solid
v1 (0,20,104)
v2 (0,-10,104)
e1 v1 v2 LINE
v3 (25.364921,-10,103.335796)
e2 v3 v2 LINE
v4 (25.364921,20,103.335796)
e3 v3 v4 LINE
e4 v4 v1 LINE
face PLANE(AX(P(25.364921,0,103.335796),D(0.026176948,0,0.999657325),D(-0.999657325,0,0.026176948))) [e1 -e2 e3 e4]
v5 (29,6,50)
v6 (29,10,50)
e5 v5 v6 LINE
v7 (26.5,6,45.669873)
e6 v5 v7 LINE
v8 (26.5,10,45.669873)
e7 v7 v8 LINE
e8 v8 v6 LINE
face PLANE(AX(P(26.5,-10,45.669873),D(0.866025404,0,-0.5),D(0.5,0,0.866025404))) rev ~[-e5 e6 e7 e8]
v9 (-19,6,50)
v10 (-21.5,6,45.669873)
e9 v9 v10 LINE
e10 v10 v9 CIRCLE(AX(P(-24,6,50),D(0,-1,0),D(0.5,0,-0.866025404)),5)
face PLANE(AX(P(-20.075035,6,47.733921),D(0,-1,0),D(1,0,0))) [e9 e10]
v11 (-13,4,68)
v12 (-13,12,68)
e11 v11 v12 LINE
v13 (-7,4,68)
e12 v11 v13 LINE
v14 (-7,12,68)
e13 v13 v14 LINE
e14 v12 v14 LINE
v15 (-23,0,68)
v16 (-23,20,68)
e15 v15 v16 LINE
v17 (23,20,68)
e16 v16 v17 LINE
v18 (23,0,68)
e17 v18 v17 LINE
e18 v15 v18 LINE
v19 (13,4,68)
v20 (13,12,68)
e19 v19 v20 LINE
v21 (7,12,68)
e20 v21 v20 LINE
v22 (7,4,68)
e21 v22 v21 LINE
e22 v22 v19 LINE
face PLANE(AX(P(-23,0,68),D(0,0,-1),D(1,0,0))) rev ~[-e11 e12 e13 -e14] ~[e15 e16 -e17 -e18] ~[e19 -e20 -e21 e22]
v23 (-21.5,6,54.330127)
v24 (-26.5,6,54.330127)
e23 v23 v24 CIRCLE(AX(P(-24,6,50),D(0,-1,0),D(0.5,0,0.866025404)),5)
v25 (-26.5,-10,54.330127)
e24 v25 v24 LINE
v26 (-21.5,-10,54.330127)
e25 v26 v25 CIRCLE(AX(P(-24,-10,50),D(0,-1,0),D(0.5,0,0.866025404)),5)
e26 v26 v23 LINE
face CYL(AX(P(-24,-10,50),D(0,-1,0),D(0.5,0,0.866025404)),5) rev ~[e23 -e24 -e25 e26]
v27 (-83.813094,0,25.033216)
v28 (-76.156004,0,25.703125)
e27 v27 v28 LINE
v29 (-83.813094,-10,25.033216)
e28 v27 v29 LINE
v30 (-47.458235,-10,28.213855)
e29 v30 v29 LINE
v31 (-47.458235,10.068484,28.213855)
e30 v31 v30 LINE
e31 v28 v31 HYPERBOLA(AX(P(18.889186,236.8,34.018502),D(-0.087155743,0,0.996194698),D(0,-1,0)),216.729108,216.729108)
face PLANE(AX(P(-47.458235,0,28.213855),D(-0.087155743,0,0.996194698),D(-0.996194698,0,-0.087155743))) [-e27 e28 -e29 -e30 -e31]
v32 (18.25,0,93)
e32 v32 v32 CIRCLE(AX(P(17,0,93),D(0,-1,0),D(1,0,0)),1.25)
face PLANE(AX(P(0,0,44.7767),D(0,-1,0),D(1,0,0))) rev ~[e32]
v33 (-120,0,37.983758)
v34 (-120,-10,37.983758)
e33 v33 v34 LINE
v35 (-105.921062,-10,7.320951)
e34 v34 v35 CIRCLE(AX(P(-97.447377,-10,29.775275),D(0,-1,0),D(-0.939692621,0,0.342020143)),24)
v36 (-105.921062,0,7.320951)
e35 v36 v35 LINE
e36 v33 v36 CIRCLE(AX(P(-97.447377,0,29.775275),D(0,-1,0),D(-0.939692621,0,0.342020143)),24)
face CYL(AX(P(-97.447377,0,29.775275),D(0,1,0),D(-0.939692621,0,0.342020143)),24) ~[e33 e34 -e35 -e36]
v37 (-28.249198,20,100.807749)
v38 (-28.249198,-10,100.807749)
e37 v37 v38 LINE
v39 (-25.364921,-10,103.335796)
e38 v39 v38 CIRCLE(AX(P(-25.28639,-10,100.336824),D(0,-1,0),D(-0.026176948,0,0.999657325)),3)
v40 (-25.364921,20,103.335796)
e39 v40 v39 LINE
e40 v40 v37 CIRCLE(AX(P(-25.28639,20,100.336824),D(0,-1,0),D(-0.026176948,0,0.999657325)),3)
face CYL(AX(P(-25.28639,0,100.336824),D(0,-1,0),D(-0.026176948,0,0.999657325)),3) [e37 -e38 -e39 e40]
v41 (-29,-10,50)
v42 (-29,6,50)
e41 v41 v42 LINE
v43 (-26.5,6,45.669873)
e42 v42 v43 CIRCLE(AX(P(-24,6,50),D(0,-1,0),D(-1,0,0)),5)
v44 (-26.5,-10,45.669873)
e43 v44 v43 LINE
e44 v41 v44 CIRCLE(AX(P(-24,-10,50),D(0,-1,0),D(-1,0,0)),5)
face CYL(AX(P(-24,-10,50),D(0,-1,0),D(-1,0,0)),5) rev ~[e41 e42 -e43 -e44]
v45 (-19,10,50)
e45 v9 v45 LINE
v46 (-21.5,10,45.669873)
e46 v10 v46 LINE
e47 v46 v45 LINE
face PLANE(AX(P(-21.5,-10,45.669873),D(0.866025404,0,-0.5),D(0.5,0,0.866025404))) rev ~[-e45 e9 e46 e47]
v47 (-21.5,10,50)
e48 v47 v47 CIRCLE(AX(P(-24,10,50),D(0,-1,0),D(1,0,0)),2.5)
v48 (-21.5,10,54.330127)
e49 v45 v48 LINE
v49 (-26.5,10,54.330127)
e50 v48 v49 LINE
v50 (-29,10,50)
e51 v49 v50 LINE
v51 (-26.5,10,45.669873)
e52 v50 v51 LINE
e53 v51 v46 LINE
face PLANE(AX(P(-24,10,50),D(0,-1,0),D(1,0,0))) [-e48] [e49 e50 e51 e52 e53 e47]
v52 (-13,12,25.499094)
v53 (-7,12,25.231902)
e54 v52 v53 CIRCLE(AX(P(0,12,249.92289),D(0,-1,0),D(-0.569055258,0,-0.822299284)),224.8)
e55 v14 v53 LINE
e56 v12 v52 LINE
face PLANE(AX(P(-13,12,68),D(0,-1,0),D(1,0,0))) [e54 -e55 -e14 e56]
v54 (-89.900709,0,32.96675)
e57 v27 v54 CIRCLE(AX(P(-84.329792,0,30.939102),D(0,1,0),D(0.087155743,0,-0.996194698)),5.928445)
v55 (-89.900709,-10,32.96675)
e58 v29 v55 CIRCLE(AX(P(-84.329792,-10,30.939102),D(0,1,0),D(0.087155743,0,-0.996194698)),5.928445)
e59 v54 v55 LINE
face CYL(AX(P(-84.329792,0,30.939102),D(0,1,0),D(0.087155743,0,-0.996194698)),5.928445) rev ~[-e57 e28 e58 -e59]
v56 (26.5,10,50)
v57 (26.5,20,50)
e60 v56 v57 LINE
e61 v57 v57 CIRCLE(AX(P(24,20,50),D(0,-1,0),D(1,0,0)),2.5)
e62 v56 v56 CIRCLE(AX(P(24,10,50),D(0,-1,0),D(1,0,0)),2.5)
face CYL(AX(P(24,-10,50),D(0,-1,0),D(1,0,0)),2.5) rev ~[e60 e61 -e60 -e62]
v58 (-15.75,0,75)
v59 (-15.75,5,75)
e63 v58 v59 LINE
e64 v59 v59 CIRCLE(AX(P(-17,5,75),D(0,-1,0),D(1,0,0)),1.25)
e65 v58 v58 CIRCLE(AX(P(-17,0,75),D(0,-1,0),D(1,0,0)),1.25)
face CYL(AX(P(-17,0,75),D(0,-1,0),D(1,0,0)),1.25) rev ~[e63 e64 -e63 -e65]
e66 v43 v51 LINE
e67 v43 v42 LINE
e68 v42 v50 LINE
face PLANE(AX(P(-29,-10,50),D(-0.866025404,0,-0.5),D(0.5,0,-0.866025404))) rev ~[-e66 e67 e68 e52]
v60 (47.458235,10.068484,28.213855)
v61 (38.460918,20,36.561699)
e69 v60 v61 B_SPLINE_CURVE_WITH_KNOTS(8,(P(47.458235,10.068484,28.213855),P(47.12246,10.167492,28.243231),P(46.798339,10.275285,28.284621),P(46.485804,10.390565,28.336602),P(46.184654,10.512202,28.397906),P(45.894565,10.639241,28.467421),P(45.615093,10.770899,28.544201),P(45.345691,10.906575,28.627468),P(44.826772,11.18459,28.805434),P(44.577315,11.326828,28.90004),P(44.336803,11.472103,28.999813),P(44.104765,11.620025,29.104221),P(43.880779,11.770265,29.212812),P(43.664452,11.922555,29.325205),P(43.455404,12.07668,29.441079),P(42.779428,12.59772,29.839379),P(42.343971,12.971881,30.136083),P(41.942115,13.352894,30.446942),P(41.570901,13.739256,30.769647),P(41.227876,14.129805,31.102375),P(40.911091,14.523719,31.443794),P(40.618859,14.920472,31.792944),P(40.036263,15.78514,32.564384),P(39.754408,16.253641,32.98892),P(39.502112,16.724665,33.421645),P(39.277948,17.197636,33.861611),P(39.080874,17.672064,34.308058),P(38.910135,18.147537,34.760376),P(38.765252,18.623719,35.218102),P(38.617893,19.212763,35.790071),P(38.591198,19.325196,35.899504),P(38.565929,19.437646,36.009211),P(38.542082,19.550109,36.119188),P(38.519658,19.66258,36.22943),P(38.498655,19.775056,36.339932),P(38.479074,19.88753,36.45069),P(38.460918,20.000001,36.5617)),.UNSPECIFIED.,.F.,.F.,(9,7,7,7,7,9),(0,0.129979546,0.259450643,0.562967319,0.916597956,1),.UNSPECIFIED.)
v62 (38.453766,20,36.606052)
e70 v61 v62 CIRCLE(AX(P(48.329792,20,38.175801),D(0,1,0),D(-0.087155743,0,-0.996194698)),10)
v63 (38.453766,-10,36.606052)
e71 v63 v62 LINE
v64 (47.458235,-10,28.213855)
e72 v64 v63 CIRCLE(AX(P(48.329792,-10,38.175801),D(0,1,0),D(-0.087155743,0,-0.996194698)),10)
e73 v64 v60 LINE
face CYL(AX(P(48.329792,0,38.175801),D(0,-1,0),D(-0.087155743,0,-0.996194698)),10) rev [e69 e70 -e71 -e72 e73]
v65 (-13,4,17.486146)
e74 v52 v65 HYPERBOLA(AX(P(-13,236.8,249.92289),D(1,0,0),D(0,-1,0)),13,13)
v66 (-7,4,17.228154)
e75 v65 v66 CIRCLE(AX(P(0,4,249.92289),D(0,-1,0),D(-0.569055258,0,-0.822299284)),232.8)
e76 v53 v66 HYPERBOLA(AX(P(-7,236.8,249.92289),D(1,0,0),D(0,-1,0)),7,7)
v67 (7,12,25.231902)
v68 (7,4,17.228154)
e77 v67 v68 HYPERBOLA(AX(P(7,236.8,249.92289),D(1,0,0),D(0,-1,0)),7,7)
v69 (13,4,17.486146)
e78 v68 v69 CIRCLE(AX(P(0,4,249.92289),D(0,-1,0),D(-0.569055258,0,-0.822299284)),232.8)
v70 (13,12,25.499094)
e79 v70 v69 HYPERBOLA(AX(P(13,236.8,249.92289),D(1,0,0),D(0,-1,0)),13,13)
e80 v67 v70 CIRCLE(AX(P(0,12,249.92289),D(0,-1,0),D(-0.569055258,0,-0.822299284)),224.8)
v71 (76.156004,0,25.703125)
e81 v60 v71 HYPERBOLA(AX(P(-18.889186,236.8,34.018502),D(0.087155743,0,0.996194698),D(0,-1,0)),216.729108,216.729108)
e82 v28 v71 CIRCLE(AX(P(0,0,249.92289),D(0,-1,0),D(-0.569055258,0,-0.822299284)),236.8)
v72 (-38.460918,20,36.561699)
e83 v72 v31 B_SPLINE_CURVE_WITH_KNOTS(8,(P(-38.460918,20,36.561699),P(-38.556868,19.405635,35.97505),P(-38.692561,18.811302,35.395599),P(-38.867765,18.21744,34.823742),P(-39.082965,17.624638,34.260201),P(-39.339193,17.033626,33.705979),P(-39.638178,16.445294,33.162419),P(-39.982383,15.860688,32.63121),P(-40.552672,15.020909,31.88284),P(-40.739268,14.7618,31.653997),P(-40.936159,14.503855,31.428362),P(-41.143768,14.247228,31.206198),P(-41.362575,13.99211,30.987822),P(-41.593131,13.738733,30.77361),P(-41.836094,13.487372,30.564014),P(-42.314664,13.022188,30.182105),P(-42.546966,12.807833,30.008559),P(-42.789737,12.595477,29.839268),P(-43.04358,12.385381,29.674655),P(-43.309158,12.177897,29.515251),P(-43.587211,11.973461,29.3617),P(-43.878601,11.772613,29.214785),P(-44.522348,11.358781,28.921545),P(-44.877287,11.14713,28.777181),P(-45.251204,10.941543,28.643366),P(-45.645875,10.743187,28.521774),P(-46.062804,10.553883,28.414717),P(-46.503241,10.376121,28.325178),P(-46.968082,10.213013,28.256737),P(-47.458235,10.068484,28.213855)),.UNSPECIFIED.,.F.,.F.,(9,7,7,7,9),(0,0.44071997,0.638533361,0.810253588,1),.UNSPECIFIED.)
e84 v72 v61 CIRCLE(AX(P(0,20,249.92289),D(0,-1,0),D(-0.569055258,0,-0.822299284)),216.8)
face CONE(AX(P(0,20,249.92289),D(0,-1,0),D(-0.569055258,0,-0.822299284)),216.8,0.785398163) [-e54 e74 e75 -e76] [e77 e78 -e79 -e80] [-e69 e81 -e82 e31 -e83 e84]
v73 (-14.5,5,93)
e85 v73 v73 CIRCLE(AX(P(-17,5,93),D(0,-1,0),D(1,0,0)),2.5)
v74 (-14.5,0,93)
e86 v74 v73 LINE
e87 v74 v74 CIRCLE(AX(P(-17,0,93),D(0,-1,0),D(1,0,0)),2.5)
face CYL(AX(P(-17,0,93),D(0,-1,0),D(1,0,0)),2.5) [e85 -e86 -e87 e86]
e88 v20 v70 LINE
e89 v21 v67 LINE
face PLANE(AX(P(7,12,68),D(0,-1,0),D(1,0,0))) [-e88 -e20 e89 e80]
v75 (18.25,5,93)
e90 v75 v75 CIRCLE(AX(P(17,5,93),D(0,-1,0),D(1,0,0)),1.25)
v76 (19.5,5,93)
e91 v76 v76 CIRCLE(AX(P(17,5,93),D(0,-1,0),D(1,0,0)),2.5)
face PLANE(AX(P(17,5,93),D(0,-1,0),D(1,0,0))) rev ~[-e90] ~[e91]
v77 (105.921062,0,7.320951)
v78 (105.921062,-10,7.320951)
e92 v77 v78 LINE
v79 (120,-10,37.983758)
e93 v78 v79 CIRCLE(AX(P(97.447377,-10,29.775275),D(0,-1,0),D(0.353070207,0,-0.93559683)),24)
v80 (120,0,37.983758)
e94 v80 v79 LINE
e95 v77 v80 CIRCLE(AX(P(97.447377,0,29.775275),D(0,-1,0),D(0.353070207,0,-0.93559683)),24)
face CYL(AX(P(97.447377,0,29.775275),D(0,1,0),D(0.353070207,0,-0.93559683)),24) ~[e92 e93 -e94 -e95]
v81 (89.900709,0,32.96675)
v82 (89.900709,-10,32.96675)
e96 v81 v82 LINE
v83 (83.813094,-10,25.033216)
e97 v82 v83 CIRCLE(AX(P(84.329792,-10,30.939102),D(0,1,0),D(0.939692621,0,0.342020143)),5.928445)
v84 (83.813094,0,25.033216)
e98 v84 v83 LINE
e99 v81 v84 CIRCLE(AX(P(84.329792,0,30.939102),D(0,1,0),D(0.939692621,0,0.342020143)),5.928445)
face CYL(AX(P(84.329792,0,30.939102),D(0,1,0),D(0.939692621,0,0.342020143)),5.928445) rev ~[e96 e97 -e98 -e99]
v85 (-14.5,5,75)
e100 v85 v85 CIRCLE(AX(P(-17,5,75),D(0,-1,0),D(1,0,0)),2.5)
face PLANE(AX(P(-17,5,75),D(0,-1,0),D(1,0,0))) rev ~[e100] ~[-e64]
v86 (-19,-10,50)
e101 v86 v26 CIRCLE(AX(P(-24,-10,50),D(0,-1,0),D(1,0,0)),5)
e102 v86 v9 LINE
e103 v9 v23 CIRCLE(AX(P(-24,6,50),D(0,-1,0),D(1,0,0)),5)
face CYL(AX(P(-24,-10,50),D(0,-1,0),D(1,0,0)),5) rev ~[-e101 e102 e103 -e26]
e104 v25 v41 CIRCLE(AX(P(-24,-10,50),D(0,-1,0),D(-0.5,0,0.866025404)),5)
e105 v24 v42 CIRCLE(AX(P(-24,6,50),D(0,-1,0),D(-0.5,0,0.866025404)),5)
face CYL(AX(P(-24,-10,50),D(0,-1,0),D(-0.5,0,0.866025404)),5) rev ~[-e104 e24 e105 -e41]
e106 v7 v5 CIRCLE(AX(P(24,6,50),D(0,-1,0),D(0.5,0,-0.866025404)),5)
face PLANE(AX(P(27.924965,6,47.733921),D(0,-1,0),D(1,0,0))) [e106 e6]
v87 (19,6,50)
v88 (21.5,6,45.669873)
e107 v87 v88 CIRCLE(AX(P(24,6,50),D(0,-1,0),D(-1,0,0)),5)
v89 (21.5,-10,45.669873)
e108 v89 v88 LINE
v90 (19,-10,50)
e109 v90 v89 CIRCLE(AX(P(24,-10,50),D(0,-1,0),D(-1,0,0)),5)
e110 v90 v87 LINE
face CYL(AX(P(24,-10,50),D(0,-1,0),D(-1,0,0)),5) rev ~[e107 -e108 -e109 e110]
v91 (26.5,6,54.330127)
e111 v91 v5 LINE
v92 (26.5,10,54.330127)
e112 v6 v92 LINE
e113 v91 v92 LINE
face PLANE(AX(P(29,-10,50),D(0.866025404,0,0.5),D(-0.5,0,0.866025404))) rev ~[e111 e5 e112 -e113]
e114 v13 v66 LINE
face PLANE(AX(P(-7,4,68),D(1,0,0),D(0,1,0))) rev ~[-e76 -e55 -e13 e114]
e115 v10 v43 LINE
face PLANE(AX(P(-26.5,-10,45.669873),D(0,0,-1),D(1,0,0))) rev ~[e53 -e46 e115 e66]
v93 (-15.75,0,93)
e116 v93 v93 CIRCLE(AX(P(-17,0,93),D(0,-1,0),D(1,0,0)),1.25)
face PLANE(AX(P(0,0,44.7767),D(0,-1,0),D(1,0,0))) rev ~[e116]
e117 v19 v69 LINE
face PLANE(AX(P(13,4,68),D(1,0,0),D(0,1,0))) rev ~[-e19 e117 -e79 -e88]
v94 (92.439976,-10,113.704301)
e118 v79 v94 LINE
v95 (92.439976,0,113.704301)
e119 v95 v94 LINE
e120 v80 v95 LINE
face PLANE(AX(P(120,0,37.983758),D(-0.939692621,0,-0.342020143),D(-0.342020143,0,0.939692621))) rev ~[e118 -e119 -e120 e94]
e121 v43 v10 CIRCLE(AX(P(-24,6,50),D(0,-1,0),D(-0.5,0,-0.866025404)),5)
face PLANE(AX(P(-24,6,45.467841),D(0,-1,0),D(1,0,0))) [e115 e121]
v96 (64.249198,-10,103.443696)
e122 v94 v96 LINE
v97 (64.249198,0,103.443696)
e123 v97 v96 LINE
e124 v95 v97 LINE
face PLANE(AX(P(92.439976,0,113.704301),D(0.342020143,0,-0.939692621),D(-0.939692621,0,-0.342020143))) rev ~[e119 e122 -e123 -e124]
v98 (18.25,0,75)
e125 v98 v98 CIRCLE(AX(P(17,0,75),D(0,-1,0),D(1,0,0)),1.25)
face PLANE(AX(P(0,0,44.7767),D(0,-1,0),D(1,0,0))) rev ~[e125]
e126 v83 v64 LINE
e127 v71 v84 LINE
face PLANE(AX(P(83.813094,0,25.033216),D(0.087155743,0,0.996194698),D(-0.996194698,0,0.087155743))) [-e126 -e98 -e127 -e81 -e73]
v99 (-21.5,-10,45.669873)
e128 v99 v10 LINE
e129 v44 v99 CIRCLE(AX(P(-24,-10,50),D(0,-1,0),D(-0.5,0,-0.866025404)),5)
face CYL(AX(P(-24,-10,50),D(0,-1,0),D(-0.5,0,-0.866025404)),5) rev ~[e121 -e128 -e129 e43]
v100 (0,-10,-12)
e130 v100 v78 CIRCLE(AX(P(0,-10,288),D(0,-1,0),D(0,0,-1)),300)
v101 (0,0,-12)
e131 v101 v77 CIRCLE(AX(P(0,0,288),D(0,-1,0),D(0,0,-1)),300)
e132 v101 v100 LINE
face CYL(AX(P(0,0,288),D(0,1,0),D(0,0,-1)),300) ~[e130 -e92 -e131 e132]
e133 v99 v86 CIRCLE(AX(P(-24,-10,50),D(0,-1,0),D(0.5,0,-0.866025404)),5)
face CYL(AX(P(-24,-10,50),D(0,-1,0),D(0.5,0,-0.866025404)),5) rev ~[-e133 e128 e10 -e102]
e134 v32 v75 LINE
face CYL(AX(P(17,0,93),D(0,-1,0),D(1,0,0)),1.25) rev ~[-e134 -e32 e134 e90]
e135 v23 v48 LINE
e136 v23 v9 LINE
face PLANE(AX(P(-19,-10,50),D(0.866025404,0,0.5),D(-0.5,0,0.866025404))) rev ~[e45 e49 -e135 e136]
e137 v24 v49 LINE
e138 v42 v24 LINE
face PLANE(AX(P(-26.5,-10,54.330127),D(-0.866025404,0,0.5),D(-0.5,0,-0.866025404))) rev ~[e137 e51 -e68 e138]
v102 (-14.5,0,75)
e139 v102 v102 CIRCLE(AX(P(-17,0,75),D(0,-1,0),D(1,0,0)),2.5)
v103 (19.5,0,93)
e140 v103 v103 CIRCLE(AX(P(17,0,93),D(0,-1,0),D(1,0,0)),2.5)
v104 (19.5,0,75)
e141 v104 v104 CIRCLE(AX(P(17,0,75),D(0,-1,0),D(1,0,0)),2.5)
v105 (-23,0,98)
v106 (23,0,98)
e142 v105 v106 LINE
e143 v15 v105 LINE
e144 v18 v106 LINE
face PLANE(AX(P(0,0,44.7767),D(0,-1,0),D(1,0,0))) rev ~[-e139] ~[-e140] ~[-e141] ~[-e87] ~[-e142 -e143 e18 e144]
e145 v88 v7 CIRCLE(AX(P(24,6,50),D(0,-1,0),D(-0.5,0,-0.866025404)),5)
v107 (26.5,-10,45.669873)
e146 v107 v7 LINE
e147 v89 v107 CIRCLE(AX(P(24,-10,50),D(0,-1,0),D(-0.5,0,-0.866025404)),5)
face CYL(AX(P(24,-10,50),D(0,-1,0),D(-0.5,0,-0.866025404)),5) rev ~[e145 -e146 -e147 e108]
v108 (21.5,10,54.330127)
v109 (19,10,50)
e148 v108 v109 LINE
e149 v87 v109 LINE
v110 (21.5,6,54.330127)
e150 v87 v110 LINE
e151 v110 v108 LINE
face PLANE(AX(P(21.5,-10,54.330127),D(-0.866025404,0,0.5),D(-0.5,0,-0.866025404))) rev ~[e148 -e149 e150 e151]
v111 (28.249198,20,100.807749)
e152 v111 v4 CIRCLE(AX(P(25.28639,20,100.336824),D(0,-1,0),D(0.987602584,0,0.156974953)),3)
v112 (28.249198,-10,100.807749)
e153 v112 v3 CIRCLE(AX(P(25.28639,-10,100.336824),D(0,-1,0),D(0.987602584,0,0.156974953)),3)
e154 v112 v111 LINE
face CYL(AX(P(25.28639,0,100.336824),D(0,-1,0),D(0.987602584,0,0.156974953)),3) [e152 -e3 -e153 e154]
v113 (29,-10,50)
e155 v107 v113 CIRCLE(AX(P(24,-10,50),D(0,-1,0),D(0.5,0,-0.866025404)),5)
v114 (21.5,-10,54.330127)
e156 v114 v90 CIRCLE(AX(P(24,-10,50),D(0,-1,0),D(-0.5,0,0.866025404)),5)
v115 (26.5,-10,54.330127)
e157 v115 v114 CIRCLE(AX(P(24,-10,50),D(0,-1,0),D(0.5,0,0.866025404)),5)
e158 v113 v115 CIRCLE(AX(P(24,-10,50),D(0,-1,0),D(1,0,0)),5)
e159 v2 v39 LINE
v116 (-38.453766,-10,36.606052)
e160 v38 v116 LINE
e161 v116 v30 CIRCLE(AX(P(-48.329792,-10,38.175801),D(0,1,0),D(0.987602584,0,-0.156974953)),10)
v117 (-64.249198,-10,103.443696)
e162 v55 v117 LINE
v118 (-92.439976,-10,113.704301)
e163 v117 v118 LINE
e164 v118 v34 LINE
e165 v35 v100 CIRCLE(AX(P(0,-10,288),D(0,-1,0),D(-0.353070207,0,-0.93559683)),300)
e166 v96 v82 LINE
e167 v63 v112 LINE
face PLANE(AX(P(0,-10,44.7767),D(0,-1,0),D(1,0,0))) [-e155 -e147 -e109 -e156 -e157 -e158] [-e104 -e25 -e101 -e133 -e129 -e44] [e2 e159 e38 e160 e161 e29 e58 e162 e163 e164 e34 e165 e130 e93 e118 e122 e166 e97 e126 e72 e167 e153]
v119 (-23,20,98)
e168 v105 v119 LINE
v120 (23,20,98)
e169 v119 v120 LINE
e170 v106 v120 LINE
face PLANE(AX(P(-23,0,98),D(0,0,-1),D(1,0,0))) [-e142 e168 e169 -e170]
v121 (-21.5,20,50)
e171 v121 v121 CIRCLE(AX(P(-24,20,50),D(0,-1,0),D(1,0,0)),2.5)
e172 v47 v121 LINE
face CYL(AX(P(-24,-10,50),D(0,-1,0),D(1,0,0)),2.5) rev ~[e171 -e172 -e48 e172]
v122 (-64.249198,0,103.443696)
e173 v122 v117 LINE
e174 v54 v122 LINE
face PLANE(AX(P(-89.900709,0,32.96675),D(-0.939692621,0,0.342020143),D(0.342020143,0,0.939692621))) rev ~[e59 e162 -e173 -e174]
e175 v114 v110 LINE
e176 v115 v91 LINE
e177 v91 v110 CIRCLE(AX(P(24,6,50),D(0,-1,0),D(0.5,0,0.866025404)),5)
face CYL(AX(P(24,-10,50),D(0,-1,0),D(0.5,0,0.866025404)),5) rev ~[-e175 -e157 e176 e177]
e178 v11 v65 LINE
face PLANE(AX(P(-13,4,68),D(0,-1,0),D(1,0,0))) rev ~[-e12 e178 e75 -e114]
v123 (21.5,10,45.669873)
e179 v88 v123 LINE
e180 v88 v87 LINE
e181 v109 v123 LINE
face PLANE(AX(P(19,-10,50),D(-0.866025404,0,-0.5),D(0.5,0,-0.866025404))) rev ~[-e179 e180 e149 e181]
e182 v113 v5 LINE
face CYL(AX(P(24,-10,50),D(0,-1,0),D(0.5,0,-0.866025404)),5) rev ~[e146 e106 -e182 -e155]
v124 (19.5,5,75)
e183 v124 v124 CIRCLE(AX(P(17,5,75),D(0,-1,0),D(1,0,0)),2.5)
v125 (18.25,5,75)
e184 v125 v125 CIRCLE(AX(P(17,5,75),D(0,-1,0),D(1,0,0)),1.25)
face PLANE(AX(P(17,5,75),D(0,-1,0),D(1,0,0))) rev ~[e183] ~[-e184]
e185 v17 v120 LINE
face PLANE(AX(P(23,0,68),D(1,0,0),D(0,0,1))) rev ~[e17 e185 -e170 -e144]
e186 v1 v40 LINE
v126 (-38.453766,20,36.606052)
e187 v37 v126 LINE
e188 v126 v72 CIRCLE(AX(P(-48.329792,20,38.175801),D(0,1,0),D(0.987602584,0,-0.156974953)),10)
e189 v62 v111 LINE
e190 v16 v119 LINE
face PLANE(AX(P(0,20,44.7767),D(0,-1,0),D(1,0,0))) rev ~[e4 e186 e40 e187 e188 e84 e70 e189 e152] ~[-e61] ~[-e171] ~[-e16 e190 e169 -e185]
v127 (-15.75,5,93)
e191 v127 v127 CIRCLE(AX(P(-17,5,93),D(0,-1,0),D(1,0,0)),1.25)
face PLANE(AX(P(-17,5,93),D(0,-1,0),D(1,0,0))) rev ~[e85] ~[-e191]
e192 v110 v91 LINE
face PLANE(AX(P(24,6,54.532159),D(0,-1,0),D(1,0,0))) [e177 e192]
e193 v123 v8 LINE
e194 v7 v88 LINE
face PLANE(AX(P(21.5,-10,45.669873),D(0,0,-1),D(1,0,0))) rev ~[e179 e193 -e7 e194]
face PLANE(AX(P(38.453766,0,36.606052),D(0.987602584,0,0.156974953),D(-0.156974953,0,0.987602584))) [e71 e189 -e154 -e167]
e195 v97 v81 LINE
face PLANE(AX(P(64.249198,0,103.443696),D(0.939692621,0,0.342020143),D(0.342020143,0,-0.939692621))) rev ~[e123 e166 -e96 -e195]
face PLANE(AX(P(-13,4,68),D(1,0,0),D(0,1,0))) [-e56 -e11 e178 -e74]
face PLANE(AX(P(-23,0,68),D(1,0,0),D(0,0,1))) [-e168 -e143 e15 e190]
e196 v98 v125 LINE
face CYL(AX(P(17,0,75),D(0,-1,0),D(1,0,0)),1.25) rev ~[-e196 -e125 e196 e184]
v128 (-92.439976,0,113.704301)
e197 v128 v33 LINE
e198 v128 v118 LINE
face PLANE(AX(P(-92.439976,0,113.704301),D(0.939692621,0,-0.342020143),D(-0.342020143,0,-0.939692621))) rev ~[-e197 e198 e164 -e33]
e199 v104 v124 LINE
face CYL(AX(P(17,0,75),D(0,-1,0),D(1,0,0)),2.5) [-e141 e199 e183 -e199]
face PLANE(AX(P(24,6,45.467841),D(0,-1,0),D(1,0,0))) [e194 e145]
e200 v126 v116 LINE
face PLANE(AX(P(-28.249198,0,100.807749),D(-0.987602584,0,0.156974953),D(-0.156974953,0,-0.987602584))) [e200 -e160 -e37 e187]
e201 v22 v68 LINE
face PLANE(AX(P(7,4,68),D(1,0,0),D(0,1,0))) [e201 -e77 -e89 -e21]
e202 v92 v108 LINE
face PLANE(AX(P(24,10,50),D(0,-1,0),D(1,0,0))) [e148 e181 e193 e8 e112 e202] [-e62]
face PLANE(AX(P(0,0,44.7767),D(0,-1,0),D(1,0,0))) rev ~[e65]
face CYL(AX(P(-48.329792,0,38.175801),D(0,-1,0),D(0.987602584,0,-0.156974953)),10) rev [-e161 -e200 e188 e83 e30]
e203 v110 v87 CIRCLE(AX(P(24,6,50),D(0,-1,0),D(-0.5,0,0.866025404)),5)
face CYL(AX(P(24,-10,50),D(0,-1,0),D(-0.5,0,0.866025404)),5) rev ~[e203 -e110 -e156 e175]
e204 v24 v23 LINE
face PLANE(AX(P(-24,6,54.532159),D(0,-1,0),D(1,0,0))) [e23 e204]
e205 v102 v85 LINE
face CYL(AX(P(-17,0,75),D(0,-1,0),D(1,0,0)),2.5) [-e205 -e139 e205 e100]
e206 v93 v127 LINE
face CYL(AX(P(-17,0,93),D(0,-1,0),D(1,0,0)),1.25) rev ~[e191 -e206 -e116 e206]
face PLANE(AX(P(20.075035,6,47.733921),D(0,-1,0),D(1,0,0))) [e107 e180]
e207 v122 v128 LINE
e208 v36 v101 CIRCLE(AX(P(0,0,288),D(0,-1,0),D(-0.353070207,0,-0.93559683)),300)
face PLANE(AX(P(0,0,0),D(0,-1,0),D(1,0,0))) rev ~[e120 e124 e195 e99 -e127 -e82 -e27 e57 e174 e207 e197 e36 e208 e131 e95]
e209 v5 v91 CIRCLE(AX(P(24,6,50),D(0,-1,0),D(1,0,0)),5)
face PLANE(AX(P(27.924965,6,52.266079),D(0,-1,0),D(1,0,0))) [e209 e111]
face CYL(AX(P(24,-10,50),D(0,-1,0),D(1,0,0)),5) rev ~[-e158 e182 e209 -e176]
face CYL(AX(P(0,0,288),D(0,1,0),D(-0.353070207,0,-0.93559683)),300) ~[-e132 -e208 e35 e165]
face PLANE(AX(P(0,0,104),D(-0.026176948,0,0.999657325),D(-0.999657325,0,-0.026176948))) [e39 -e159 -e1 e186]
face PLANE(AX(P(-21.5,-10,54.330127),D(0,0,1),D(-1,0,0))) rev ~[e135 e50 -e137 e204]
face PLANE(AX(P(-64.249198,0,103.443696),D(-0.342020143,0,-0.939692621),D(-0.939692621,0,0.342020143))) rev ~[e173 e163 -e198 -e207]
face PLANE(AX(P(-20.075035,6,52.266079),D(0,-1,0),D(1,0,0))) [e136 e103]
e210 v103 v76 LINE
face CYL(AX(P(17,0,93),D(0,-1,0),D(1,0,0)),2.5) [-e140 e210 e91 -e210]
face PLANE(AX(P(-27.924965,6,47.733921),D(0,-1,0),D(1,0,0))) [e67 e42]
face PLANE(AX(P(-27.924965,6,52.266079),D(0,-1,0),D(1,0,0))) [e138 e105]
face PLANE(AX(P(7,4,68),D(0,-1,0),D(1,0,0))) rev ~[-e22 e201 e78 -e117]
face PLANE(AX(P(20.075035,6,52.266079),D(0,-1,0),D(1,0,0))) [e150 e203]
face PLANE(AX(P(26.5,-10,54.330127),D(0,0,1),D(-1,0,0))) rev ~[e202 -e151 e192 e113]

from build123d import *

# Parameters (mm, degrees)
F0_W        = 46
F0_H        = 30
F0_R        = 2.5
F0_R_2      = 1.25
F1_DEPTH    = 10
F2_DEPTH    = 20
F3_R        = 2.5
F4_DEPTH    = 30
F5_DEPTH    = 20
F6_DEPTH    = 16
F7_DEPTH    = 5
F8_T4_ANGLE = 69.3687445925
F9_W        = 6
F9_H        = 8
F10_REACH   = 90.001


# Not quite as in the source:
# - a fillet or chamfer that OpenCascade refuses, or shapes differently, is made with other operations: its cross-section is extruded or revolved along the edge and cut away or added
# - a feature names something its author has since deleted; it is built from what else it names


with BuildPart() as f1:
    # F0 (on Front) → F1 (new body)
    with BuildSketch(Plane.XZ):
        with BuildLine():
            Line((25.3649208898, 103.335796171), (0, 104))
            Line((0, 104), (-25.3649208898, 103.335796171))
            ThreePointArc((-25.3649208898, 103.335796171), (-27.2638102508, 102.5928847735), (-28.2491977972, 100.8077490551))
            Line((-28.2491977972, 100.8077490551), (-38.4537664635, 36.6060519686))
            ThreePointArc((-38.4537664635, 36.6060519686), (-41.511810122, 30.8603986419), (-47.4582348771, 28.2138545179))
            Line((-47.4582348771, 28.2138545179), (-83.8130942566, 25.0332164582))
            ThreePointArc((-83.8130942566, 25.0332164582), (0, 9.922889923), (83.8130942566, 25.0332164582))
            Line((83.8130942566, 25.0332164582), (47.4582348771, 28.2138545179))
            ThreePointArc((47.4582348771, 28.2138545179), (41.511810122, 30.8603986419), (38.4537664635, 36.6060519686))
            Line((38.4537664635, 36.6060519686), (28.2491977972, 100.8077490551))
            ThreePointArc((28.2491977972, 100.8077490551), (27.2638102508, 102.5928847735), (25.3649208898, 103.335796171))
        make_face()
        with Locations((0, 83)):
            Rectangle(F0_W, F0_H, mode=Mode.SUBTRACT)
        with Locations((0, 83)):
            Rectangle(F0_W, F0_H)
        with Locations((-17, 75)):
            Circle(F0_R, mode=Mode.SUBTRACT)
        with Locations((-17, 93)):
            Circle(F0_R, mode=Mode.SUBTRACT)
        with Locations((17, 75)):
            Circle(F0_R, mode=Mode.SUBTRACT)
        with Locations((17, 93)):
            Circle(F0_R, mode=Mode.SUBTRACT)
        with Locations((17, 93)):
            Circle(F0_R)
        with Locations((17, 93)):
            Circle(F0_R_2, mode=Mode.SUBTRACT)
        with Locations((17, 75)):
            Circle(F0_R)
        with Locations((17, 75)):
            Circle(F0_R_2, mode=Mode.SUBTRACT)
        with Locations((-17, 93)):
            Circle(F0_R)
        with Locations((-17, 93)):
            Circle(F0_R_2, mode=Mode.SUBTRACT)
        with Locations((-17, 75)):
            Circle(F0_R)
        with Locations((-17, 75)):
            Circle(F0_R_2, mode=Mode.SUBTRACT)
        with Locations((17, 93)):
            Circle(F0_R_2)
        with Locations((-17, 93)):
            Circle(F0_R_2)
        with Locations((-17, 75)):
            Circle(F0_R_2)
        with Locations((17, 75)):
            Circle(F0_R_2)
        with BuildLine():
            ThreePointArc((83.8130942566, 25.0332164582), (0, 9.922889923), (-83.8130942566, 25.0332164582))
            ThreePointArc((-83.8130942566, 25.0332164582), (-89.0331441362, 27.330093377), (-89.9007085466, 32.9667498611))
            Line((-89.9007085466, 32.9667498611), (-64.2491977972, 103.44369642))
            Line((-64.2491977972, 103.44369642), (-92.4399764208, 113.7043007198))
            Line((-92.4399764208, 113.7043007198), (-120, 37.9837582563))
            ThreePointArc((-120, 37.9837582563), (-119.2581515912, 19.7607795149), (-105.9210620665, 7.3209508875))
            ThreePointArc((-105.9210620665, 7.3209508875), (-53.8344000907, -7.1302379745), (0, -12))
            ThreePointArc((0, -12), (53.8344000907, -7.1302379745), (105.9210620665, 7.3209508875))
            ThreePointArc((105.9210620665, 7.3209508875), (119.2581515912, 19.7607795149), (120, 37.9837582563))
            Line((120, 37.9837582563), (92.4399764208, 113.7043007198))
            Line((92.4399764208, 113.7043007198), (64.2491977972, 103.44369642))
            Line((64.2491977972, 103.44369642), (89.9007085466, 32.9667498611))
            ThreePointArc((89.9007085466, 32.9667498611), (89.0331441362, 27.330093377), (83.8130942566, 25.0332164582))
        make_face()
    extrude(amount=F1_DEPTH)

    # F0 (on Front) → F2 (join)
    with BuildSketch(Plane.XZ):
        with BuildLine():
            Line((25.3649208898, 103.335796171), (0, 104))
            Line((0, 104), (-25.3649208898, 103.335796171))
            ThreePointArc((-25.3649208898, 103.335796171), (-27.2638102508, 102.5928847735), (-28.2491977972, 100.8077490551))
            Line((-28.2491977972, 100.8077490551), (-38.4537664635, 36.6060519686))
            ThreePointArc((-38.4537664635, 36.6060519686), (-41.511810122, 30.8603986419), (-47.4582348771, 28.2138545179))
            Line((-47.4582348771, 28.2138545179), (-83.8130942566, 25.0332164582))
            ThreePointArc((-83.8130942566, 25.0332164582), (0, 9.922889923), (83.8130942566, 25.0332164582))
            Line((83.8130942566, 25.0332164582), (47.4582348771, 28.2138545179))
            ThreePointArc((47.4582348771, 28.2138545179), (41.511810122, 30.8603986419), (38.4537664635, 36.6060519686))
            Line((38.4537664635, 36.6060519686), (28.2491977972, 100.8077490551))
            ThreePointArc((28.2491977972, 100.8077490551), (27.2638102508, 102.5928847735), (25.3649208898, 103.335796171))
        make_face()
        with Locations((0, 83)):
            Rectangle(F0_W, F0_H, mode=Mode.SUBTRACT)
    extrude(amount=-F2_DEPTH)

    # F3 (on face) → F4 (cut, through all)
    with BuildSketch(Plane.XZ.offset(10)):
        with Locations((-24, 50)):
            Circle(F3_R)
        with Locations((24, 50)):
            Circle(F3_R)
    extrude(amount=-F4_DEPTH, mode=Mode.SUBTRACT)

    # F3 (on face) → F5 (cut, through all)
    with BuildSketch(Plane.XZ.offset(10)):
        Polygon((-21.5, 45.6698729811), (-19, 50), (-21.5, 54.3301270189), (-26.5, 54.3301270189), (-29, 50), (-26.5, 45.6698729811), align=None)
        with Locations((-24, 50)):
            Circle(F3_R, mode=Mode.SUBTRACT)
        Polygon((26.5, 45.6698729811), (29, 50), (26.5, 54.3301270189), (21.5, 54.3301270189), (19, 50), (21.5, 45.6698729811), align=None)
        with Locations((24, 50)):
            Circle(F3_R, mode=Mode.SUBTRACT)
    extrude(amount=-F5_DEPTH, mode=Mode.SUBTRACT)

    # F3 (on face) → F6 (cut, through all)
    with BuildSketch(Plane.XZ.offset(10)):
        with BuildLine():
            ThreePointArc((-29, 50), (-28.3301270189, 47.5), (-26.5, 45.6698729811))
            Line((-26.5, 45.6698729811), (-29, 50))
        make_face()
        with BuildLine():
            Line((-29, 50), (-26.5, 54.3301270189))
            ThreePointArc((-26.5, 54.3301270189), (-28.3301270189, 52.5), (-29, 50))
        make_face()
        with BuildLine():
            Line((-26.5, 54.3301270189), (-21.5, 54.3301270189))
            ThreePointArc((-21.5, 54.3301270189), (-24, 55), (-26.5, 54.3301270189))
        make_face()
        with BuildLine():
            Line((-21.5, 54.3301270189), (-19, 50))
            ThreePointArc((-19, 50), (-19.6698729811, 52.5), (-21.5, 54.3301270189))
        make_face()
        with BuildLine():
            ThreePointArc((-21.5, 45.6698729811), (-19.6698729811, 47.5), (-19, 50))
            Line((-19, 50), (-21.5, 45.6698729811))
        make_face()
        with BuildLine():
            ThreePointArc((-26.5, 45.6698729811), (-24, 45), (-21.5, 45.6698729811))
            Line((-21.5, 45.6698729811), (-26.5, 45.6698729811))
        make_face()
        with BuildLine():
            Line((19, 50), (21.5, 54.3301270189))
            ThreePointArc((21.5, 54.3301270189), (19.6698729811, 52.5), (19, 50))
        make_face()
        with BuildLine():
            Line((21.5, 54.3301270189), (26.5, 54.3301270189))
            ThreePointArc((26.5, 54.3301270189), (24, 55), (21.5, 54.3301270189))
        make_face()
        with BuildLine():
            Line((26.5, 54.3301270189), (29, 50))
            ThreePointArc((29, 50), (28.3301270189, 52.5), (26.5, 54.3301270189))
        make_face()
        with BuildLine():
            ThreePointArc((26.5, 45.6698729811), (28.3301270189, 47.5), (29, 50))
            Line((29, 50), (26.5, 45.6698729811))
        make_face()
        with BuildLine():
            ThreePointArc((21.5, 45.6698729811), (24, 45), (26.5, 45.6698729811))
            Line((26.5, 45.6698729811), (21.5, 45.6698729811))
        make_face()
        with BuildLine():
            ThreePointArc((19, 50), (19.6698729811, 47.5), (21.5, 45.6698729811))
            Line((21.5, 45.6698729811), (19, 50))
        make_face()
    extrude(amount=-F6_DEPTH, mode=Mode.SUBTRACT)

    # F0 (on Front) → F7 (join)
    with BuildSketch(Plane.XZ):
        with Locations((17, 93)):
            Circle(F0_R)
        with Locations((17, 93)):
            Circle(F0_R_2, mode=Mode.SUBTRACT)
        with Locations((17, 75)):
            Circle(F0_R)
        with Locations((17, 75)):
            Circle(F0_R_2, mode=Mode.SUBTRACT)
        with Locations((-17, 75)):
            Circle(F0_R)
        with Locations((-17, 75)):
            Circle(F0_R_2, mode=Mode.SUBTRACT)
        with Locations((-17, 93)):
            Circle(F0_R)
        with Locations((-17, 93)):
            Circle(F0_R_2, mode=Mode.SUBTRACT)
    extrude(amount=-F7_DEPTH)

    # F8: chamfer of 23.2 on 1 edges, made by hand


with BuildPart() as f8_tool2:
    # F8_s3 → F8_t4 (revolve)
    with BuildSketch(Plane(origin=(-116.9473505208, 0, 80.9310017088), x_dir=(0, 1, 0), z_dir=(-0.8222992842, 0, 0.5690552585))):
        Polygon((20, 11.2885865066), (-3.2, 34.4885865066), (20, 34.4885865066), align=None)
    revolve(axis=Axis((0, 20, 249.922889923), (0, -1, 0)), revolution_arc=F8_T4_ANGLE)

    split(bisect_by=Plane.XZ, keep=Keep.BOTTOM)


with BuildPart() as f1_1:
    add(f1.part)

    # F8_t1: cut F8_tool2
    add(f8_tool2.part, mode=Mode.SUBTRACT)

    f10_end = f1_1.faces().sort_by_distance((0, 10, 23.1228899231))[0]
    # F9 (on face) → F10 (cut, up to a face of the model that its end follows)
    with BuildSketch(Plane.XY.offset(68)):
        with Locations((10, 8)):
            Rectangle(F9_W, F9_H)
        with Locations((-10, 8)):
            Rectangle(F9_W, F9_H)
    f10_long = extrude(amount=-F10_REACH, mode=Mode.PRIVATE)
    add(split(f10_long, bisect_by=f10_end, keep=Keep.BOTTOM, mode=Mode.PRIVATE), mode=Mode.SUBTRACT)


solid = f1_1.part
